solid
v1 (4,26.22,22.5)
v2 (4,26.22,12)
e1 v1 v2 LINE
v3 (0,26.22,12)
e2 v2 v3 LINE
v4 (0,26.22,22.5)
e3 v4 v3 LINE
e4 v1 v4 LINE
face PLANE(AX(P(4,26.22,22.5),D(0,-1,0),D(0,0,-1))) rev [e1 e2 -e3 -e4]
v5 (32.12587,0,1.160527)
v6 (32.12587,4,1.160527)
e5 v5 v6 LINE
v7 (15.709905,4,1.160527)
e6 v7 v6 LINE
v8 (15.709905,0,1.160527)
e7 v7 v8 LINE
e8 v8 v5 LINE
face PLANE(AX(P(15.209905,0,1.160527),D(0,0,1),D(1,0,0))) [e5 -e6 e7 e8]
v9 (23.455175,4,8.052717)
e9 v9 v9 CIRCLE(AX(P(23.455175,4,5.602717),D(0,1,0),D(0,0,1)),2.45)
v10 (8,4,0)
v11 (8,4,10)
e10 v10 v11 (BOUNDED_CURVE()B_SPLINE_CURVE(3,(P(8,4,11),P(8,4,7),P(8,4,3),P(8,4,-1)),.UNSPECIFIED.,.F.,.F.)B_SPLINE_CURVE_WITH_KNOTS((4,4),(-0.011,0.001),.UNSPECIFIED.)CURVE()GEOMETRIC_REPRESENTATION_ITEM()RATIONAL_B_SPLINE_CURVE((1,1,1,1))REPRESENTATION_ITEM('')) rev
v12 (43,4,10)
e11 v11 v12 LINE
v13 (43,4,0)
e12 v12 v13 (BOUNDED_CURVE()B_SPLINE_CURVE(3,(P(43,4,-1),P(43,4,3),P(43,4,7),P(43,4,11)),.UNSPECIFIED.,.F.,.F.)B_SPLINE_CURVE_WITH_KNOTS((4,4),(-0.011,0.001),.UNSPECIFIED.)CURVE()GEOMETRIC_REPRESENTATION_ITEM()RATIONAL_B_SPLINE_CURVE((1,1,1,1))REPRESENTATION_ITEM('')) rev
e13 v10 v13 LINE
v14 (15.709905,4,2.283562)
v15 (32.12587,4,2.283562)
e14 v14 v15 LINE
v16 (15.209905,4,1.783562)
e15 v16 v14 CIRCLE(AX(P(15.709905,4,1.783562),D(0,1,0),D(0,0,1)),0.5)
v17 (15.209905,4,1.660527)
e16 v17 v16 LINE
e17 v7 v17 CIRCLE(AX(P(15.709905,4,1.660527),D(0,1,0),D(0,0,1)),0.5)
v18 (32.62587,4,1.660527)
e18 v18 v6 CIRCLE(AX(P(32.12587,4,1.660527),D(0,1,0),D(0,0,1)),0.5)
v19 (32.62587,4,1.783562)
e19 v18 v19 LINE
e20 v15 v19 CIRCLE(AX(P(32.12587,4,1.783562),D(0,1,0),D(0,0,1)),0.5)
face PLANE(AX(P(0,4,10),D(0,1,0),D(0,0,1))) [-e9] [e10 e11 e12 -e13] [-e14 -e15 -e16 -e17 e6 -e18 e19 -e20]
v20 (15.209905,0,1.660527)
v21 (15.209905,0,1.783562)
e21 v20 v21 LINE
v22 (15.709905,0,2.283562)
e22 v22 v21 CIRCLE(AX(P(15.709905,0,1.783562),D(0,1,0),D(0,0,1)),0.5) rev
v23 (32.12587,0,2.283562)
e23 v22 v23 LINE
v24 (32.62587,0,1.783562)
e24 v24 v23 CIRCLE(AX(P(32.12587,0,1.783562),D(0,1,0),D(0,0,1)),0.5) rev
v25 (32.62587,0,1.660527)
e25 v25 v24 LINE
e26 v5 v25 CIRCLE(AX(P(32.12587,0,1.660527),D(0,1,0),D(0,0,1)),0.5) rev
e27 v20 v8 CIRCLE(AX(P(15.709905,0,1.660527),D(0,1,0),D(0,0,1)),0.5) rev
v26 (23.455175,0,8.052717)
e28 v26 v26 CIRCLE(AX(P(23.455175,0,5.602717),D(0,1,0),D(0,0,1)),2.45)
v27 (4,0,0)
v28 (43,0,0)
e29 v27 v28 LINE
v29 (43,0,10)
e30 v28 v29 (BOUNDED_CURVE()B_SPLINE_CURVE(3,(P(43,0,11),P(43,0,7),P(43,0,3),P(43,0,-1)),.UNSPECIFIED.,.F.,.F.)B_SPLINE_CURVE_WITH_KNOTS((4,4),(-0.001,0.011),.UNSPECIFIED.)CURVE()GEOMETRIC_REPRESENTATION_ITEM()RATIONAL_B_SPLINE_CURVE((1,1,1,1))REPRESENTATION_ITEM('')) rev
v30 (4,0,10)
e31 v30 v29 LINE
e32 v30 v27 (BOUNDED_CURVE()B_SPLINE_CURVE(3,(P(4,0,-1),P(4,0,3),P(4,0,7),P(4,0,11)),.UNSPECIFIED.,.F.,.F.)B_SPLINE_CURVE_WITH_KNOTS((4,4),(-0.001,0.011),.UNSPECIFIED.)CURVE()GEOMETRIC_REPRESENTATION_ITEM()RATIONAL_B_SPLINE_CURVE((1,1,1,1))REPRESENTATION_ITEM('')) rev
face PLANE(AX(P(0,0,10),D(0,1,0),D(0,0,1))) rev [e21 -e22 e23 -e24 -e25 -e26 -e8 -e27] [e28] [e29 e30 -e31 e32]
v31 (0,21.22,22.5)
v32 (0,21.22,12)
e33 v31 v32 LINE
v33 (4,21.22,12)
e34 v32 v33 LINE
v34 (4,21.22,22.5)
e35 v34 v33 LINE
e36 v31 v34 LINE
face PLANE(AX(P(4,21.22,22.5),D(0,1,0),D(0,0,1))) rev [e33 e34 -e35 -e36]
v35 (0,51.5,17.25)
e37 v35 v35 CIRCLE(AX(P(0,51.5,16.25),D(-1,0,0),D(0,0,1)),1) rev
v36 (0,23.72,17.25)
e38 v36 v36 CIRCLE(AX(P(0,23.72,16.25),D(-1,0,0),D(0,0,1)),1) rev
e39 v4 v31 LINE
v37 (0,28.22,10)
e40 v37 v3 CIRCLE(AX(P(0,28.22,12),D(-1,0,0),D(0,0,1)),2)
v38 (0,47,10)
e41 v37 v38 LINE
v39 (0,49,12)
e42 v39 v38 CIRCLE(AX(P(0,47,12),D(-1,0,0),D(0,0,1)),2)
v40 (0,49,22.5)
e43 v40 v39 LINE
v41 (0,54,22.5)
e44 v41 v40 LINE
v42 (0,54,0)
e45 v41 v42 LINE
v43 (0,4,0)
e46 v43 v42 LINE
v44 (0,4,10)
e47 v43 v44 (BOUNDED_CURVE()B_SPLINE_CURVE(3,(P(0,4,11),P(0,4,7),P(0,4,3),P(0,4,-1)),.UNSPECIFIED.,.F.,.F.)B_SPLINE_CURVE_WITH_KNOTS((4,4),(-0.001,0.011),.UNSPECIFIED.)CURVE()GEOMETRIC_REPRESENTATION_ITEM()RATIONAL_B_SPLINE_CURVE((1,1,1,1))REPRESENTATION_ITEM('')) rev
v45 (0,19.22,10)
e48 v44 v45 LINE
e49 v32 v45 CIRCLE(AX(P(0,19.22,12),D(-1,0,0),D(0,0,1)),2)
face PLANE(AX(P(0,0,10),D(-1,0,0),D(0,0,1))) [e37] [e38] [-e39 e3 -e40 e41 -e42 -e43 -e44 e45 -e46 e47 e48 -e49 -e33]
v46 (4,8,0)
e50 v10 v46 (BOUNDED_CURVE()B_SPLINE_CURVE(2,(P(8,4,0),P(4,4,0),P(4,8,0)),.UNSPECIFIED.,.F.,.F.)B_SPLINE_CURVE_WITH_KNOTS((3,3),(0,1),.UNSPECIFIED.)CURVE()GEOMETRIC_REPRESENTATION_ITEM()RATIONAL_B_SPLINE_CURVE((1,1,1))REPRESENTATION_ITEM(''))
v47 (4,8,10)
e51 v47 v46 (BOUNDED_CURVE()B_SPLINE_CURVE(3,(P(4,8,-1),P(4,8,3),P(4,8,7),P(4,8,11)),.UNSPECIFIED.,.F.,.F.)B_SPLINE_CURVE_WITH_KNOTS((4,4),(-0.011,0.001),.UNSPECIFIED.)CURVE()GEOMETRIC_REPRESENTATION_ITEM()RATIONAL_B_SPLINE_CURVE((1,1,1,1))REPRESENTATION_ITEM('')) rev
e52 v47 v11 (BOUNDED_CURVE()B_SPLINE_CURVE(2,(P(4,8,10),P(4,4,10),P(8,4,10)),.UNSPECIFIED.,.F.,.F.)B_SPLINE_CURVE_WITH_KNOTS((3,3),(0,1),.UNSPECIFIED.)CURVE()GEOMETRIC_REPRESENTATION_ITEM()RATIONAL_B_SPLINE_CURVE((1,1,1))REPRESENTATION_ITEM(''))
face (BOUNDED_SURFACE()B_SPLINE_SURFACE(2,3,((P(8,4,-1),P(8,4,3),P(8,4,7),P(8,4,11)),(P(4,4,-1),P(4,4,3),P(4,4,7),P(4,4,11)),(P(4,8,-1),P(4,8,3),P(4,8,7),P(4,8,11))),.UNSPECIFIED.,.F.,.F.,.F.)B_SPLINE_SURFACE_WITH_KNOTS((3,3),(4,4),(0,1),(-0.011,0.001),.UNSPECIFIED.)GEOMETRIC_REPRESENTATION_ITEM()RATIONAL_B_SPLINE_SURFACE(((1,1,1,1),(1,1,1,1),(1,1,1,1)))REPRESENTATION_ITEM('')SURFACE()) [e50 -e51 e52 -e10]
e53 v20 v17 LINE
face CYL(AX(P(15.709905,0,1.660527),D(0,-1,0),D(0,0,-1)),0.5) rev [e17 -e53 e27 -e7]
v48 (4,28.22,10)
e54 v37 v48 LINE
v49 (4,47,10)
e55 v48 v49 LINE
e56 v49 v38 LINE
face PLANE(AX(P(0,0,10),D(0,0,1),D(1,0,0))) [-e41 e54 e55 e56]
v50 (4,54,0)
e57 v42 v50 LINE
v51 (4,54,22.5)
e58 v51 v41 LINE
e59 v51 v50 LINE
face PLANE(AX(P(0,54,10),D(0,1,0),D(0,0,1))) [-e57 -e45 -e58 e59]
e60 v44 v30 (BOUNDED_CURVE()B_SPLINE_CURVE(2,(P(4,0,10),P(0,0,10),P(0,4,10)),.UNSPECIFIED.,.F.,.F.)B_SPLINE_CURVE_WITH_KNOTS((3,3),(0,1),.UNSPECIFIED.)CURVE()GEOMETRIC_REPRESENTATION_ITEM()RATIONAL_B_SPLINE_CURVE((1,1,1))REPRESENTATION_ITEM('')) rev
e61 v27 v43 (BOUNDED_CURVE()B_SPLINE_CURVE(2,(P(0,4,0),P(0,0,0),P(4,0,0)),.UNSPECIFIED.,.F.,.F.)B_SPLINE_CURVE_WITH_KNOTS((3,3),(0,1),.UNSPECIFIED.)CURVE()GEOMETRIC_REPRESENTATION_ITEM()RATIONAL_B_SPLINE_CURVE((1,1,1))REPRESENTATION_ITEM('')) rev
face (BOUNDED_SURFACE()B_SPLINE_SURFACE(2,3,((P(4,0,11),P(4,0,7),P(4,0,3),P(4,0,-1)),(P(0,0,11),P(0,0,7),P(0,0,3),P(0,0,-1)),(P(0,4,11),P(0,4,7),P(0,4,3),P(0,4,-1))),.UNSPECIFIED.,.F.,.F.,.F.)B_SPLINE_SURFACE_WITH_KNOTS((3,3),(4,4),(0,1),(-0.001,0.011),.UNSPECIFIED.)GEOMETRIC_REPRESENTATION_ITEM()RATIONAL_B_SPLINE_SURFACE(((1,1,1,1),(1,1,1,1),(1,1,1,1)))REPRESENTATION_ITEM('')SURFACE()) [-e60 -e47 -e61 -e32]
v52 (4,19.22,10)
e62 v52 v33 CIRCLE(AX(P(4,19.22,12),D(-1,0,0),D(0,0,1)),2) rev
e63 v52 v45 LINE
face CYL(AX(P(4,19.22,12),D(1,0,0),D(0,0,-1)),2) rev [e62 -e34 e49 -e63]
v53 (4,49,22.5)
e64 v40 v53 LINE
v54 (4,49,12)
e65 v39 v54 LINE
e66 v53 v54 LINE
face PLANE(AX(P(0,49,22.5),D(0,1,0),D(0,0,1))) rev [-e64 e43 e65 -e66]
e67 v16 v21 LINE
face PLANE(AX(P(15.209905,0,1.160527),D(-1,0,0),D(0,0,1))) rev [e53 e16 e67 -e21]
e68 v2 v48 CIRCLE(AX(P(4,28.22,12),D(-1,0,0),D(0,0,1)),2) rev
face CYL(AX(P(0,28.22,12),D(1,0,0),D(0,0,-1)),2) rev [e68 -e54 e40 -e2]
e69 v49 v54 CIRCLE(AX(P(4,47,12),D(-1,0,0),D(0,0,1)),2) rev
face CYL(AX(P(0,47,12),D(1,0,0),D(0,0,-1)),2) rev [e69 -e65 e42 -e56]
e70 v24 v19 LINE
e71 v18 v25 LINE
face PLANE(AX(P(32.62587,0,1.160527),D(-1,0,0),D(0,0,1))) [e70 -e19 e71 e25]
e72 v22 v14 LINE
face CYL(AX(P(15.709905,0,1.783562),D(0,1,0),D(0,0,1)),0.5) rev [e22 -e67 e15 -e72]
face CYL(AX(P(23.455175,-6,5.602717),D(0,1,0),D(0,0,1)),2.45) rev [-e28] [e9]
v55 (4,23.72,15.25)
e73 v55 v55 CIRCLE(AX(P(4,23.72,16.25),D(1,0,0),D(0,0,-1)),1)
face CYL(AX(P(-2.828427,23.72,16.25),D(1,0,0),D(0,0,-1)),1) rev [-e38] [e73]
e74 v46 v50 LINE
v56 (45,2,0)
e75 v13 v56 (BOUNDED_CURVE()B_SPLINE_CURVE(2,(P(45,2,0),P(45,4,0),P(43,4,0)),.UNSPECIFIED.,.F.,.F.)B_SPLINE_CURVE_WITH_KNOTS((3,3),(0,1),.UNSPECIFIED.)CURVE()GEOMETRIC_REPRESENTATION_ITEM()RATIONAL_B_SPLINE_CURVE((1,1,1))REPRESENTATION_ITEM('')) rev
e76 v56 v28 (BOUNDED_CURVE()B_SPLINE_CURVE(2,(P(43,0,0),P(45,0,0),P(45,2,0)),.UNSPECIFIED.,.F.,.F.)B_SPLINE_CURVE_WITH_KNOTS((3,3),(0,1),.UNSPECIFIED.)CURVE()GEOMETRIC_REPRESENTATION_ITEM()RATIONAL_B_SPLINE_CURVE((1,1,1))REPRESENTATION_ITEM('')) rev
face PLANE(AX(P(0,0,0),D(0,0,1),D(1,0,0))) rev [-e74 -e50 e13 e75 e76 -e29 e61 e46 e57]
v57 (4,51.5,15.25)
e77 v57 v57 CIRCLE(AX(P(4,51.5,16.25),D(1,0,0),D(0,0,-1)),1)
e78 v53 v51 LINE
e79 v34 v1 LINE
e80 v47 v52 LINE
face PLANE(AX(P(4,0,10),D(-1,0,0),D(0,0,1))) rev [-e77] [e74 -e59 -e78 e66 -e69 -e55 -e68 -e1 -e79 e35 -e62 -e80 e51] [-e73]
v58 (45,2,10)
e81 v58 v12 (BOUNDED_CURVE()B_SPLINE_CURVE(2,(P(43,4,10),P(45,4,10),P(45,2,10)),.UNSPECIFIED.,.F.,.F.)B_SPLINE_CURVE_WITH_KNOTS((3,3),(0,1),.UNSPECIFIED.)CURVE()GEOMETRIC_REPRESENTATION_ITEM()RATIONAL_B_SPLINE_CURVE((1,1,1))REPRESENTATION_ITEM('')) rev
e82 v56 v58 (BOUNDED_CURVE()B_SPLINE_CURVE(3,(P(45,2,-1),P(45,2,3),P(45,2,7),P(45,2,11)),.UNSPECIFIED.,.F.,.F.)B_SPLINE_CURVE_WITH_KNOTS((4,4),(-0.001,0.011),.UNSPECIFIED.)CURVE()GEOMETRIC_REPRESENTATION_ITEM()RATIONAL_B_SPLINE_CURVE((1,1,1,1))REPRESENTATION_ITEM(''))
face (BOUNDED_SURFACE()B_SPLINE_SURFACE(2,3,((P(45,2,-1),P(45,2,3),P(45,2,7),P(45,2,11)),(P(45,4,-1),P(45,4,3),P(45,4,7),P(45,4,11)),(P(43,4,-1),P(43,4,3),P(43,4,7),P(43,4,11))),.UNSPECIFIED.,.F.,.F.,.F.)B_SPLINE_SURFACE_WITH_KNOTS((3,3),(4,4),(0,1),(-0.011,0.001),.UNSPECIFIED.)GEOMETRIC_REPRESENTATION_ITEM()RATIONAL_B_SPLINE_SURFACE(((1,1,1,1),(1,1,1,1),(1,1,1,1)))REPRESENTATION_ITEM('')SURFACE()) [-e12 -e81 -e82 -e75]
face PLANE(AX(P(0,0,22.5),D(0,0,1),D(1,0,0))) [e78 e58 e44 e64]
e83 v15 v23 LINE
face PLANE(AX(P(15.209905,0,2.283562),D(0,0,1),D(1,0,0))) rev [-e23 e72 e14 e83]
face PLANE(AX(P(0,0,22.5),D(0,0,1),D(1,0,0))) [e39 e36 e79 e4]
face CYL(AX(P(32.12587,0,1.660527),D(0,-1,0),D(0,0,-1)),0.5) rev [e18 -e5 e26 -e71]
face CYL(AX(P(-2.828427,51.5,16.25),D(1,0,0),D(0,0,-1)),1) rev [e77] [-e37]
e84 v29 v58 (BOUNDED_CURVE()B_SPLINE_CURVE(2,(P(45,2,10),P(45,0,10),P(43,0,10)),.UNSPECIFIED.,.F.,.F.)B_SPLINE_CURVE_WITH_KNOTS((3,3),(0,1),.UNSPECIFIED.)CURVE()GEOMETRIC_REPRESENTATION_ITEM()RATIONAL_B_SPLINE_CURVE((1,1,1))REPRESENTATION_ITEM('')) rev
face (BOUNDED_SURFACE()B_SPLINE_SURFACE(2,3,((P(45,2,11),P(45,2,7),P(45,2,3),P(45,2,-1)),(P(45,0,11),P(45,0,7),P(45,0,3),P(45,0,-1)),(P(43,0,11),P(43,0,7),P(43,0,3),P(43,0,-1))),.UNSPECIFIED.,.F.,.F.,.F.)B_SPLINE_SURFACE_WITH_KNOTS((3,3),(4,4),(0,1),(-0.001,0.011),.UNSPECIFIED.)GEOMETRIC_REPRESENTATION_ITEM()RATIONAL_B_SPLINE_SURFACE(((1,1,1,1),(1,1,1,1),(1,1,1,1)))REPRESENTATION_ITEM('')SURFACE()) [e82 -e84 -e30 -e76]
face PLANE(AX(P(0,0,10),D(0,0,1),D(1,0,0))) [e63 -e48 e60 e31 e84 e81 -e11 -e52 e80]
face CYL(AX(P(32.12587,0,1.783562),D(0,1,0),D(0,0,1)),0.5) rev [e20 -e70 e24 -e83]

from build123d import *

# Parameters (mm, degrees)
SKETCH_1_W          = 4
SKETCH_1_H          = 50
SKETCH_1_W_2        = 45
SKETCH_1_H_2        = 4
EXTRUDE_1_DEPTH     = 10
SKETCH_2_W          = 4
SKETCH_2_H          = 5
EXTRUDE_2_DEPTH     = 12.5
SKETCH_3_R          = 1
CUT_EXTRUDE_1_DEPTH = 4
FILLET_1_DEPTH      = 10
FILLET_2_SIZE       = 4
FILLET_3_SIZE       = 2
FILLET_4_SIZE       = 2
SKETCH_27_R         = 1.552273675
CUT_EXTRUDE_2_DEPTH = 4
CUT_EXTRUDE_2_DRAFT = -7.86
FILLET_5_R          = 2
FILLET_6_R          = 2
FILLET_7_R          = 2
SKETCH_32_W         = 17.415964898
SKETCH_32_H         = 1.123035165
CUT_EXTRUDE_3_DEPTH = 4
SKETCH_26_R         = 2.45
CUT_EXTRUDE3_DEPTH  = 10
FILLET1_R           = 0.5
FILLET2_R           = 0.5
FILLET3_R           = 0.5
FILLET4_R           = 0.5


with BuildPart() as part:
    # Эскиз1 → Бобышка-Вытянуть1 (new body)
    with BuildSketch(Plane.XY):
        with Locations((2, 29)):
            Rectangle(SKETCH_1_W, SKETCH_1_H)
        with Locations((22.5, 2)):
            Rectangle(SKETCH_1_W_2, SKETCH_1_H_2)
    extrude(amount=EXTRUDE_1_DEPTH)

    # Эскиз2 → Бобышка-Вытянуть2 (add)
    with BuildSketch(Plane.XY.offset(10)):
        with Locations((2, 51.5)):
            Rectangle(SKETCH_2_W, SKETCH_2_H)
        with Locations((2, 23.72)):
            Rectangle(SKETCH_2_W, SKETCH_2_H)
    extrude(amount=EXTRUDE_2_DEPTH)

    # Эскиз3 → Вырез-Вытянуть1 (cut)
    with BuildSketch(Plane(origin=(4, 0, 0), x_dir=(0, 0, -1), z_dir=(1, 0, 0))):
        with Locations((-16.25, 51.5)):
            Circle(SKETCH_3_R)
        with Locations((-16.25, 23.72)):
            Circle(SKETCH_3_R)
    extrude(amount=-CUT_EXTRUDE_1_DEPTH, mode=Mode.SUBTRACT)

    # Скругление1: read off the stored shape, not the designer's step
    # Скругление1 outline → Скругление1 (add)
    with BuildSketch(Plane.XY):
        with BuildLine():
            Line((4, 4), (8, 4))
            add(Edge.make_bspline(
                [(8, 4), (4, 4), (4, 8)],
                knots=[0, 0, 0, 1, 1, 1], degree=2))
            Line((4, 8), (4, 4))
        make_face()
    extrude(amount=FILLET_1_DEPTH)

    # Скругление2
    # a fillet whose section is not a circle: 4 mm, written as the material it takes off along each edge
    with BuildSketch(Plane(origin=(0, 0, -10), x_dir=(0, 1, 0), z_dir=(0, 0, 1))) as fillet_2_piece_1:
        with BuildLine():
            Bezier((FILLET_2_SIZE, 0), (0, 0), (0, -FILLET_2_SIZE), weights=[1, 1, 1])
            Line((0, -FILLET_2_SIZE), (0, 0))
            Line((0, 0), (FILLET_2_SIZE, 0))
        make_face()
    extrude(amount=30, mode=Mode.SUBTRACT)

    # Скругление3
    # a fillet whose section is not a circle: 2 mm, written as the material it takes off along each edge
    with BuildSketch(Plane(origin=(45, 4, -5), x_dir=(-1, 0, 0), z_dir=(0, 0, 1))) as fillet_3_piece_1:
        with BuildLine():
            Bezier((FILLET_3_SIZE, 0), (0, 0), (0, FILLET_3_SIZE), weights=[1, 1, 1])
            Line((0, FILLET_3_SIZE), (0, 0))
            Line((0, 0), (FILLET_3_SIZE, 0))
        make_face()
    extrude(amount=20, mode=Mode.SUBTRACT)

    # Скругление4
    # a fillet whose section is not a circle: 2 mm, written as the material it takes off along each edge
    with BuildSketch(Plane(origin=(45, 0, -5), x_dir=(0, 1, 0), z_dir=(0, 0, 1))) as fillet_4_piece_1:
        with BuildLine():
            Bezier((FILLET_4_SIZE, 0), (0, 0), (0, FILLET_4_SIZE), weights=[1, 1, 1])
            Line((0, FILLET_4_SIZE), (0, 0))
            Line((0, 0), (FILLET_4_SIZE, 0))
        make_face()
    extrude(amount=20, mode=Mode.SUBTRACT)


with BuildPart() as cut_extrude_2_tool:
    # Эскиз27 → Вырез-Вытянуть2 (with draft: the straight prism first)
    with BuildSketch(Plane(origin=(0, 4, 0), x_dir=(1, 0, 0), z_dir=(0, 1, 0))):
        with Locations((23.455175104, -5.602717063)):
            Circle(SKETCH_27_R)
    extrude(amount=-CUT_EXTRUDE_2_DEPTH)
    # Вырез-Вытянуть2: the draft: its side faces are tilted about the plane it starts from
    cut_extrude_2_sides = [cut_extrude_2_tool.faces().sort_by_distance(p)[0] for p in [
        (21.902901429, 2, 5.602717063),
    ]]
    draft(cut_extrude_2_sides, Plane(origin=(0, 4, 0), x_dir=(1, 0, 0), z_dir=(0, 1, 0)), CUT_EXTRUDE_2_DRAFT)


with BuildPart() as part_1:
    add(part.part)

    # Вырез-Вытянуть2: cut by cut_extrude_2_tool
    add(cut_extrude_2_tool.part, mode=Mode.SUBTRACT)

    # Скругление5
    fillet_5_edges = [part_1.edges().sort_by_distance(p)[0] for p in [
        (2, 49, 10),
    ]]
    fillet(fillet_5_edges, radius=FILLET_5_R)

    # Скругление6
    fillet_6_edges = [part_1.edges().sort_by_distance(p)[0] for p in [
        (2, 21.22, 10),
    ]]
    fillet(fillet_6_edges, radius=FILLET_6_R)

    # Скругление7
    fillet_7_edges = [part_1.edges().sort_by_distance(p)[0] for p in [
        (2, 26.22, 10),
    ]]
    fillet(fillet_7_edges, radius=FILLET_7_R)

    # Эскиз32 → Вырез-Вытянуть3 (cut)
    with BuildSketch(Plane(origin=(0, 4, 0), x_dir=(1, 0, 0), z_dir=(0, 1, 0))):
        with Locations((23.917887929, -1.722044793)):
            Rectangle(SKETCH_32_W, SKETCH_32_H)
    extrude(amount=-CUT_EXTRUDE_3_DEPTH, mode=Mode.SUBTRACT)

    # Эскиз26 → Cut-Extrude3 (cut)
    with BuildSketch(Plane(origin=(0, 4, 0), x_dir=(1, 0, 0), z_dir=(0, 1, 0))):
        with Locations(Location((23.455175104, -5.602717063, 0), (0, 0, 270))):
            Circle(SKETCH_26_R)
    extrude(amount=-CUT_EXTRUDE3_DEPTH, mode=Mode.SUBTRACT)

    # Fillet1
    fillet1_edges = [part_1.edges().sort_by_distance(p)[0] for p in [
        (32.625870378, 2, 1.16052721),
    ]]
    fillet(fillet1_edges, radius=FILLET1_R)

    # Fillet2
    fillet2_edges = [part_1.edges().sort_by_distance(p)[0] for p in [
        (32.625870378, 2, 2.283562375),
    ]]
    fillet(fillet2_edges, radius=FILLET2_R)

    # Fillet3
    fillet3_edges = [part_1.edges().sort_by_distance(p)[0] for p in [
        (15.20990548, 2, 1.16052721),
    ]]
    fillet(fillet3_edges, radius=FILLET3_R)

    # Fillet4
    fillet4_edges = [part_1.edges().sort_by_distance(p)[0] for p in [
        (15.20990548, 2, 2.283562375),
    ]]
    fillet(fillet4_edges, radius=FILLET4_R)


solid = part_1.part
